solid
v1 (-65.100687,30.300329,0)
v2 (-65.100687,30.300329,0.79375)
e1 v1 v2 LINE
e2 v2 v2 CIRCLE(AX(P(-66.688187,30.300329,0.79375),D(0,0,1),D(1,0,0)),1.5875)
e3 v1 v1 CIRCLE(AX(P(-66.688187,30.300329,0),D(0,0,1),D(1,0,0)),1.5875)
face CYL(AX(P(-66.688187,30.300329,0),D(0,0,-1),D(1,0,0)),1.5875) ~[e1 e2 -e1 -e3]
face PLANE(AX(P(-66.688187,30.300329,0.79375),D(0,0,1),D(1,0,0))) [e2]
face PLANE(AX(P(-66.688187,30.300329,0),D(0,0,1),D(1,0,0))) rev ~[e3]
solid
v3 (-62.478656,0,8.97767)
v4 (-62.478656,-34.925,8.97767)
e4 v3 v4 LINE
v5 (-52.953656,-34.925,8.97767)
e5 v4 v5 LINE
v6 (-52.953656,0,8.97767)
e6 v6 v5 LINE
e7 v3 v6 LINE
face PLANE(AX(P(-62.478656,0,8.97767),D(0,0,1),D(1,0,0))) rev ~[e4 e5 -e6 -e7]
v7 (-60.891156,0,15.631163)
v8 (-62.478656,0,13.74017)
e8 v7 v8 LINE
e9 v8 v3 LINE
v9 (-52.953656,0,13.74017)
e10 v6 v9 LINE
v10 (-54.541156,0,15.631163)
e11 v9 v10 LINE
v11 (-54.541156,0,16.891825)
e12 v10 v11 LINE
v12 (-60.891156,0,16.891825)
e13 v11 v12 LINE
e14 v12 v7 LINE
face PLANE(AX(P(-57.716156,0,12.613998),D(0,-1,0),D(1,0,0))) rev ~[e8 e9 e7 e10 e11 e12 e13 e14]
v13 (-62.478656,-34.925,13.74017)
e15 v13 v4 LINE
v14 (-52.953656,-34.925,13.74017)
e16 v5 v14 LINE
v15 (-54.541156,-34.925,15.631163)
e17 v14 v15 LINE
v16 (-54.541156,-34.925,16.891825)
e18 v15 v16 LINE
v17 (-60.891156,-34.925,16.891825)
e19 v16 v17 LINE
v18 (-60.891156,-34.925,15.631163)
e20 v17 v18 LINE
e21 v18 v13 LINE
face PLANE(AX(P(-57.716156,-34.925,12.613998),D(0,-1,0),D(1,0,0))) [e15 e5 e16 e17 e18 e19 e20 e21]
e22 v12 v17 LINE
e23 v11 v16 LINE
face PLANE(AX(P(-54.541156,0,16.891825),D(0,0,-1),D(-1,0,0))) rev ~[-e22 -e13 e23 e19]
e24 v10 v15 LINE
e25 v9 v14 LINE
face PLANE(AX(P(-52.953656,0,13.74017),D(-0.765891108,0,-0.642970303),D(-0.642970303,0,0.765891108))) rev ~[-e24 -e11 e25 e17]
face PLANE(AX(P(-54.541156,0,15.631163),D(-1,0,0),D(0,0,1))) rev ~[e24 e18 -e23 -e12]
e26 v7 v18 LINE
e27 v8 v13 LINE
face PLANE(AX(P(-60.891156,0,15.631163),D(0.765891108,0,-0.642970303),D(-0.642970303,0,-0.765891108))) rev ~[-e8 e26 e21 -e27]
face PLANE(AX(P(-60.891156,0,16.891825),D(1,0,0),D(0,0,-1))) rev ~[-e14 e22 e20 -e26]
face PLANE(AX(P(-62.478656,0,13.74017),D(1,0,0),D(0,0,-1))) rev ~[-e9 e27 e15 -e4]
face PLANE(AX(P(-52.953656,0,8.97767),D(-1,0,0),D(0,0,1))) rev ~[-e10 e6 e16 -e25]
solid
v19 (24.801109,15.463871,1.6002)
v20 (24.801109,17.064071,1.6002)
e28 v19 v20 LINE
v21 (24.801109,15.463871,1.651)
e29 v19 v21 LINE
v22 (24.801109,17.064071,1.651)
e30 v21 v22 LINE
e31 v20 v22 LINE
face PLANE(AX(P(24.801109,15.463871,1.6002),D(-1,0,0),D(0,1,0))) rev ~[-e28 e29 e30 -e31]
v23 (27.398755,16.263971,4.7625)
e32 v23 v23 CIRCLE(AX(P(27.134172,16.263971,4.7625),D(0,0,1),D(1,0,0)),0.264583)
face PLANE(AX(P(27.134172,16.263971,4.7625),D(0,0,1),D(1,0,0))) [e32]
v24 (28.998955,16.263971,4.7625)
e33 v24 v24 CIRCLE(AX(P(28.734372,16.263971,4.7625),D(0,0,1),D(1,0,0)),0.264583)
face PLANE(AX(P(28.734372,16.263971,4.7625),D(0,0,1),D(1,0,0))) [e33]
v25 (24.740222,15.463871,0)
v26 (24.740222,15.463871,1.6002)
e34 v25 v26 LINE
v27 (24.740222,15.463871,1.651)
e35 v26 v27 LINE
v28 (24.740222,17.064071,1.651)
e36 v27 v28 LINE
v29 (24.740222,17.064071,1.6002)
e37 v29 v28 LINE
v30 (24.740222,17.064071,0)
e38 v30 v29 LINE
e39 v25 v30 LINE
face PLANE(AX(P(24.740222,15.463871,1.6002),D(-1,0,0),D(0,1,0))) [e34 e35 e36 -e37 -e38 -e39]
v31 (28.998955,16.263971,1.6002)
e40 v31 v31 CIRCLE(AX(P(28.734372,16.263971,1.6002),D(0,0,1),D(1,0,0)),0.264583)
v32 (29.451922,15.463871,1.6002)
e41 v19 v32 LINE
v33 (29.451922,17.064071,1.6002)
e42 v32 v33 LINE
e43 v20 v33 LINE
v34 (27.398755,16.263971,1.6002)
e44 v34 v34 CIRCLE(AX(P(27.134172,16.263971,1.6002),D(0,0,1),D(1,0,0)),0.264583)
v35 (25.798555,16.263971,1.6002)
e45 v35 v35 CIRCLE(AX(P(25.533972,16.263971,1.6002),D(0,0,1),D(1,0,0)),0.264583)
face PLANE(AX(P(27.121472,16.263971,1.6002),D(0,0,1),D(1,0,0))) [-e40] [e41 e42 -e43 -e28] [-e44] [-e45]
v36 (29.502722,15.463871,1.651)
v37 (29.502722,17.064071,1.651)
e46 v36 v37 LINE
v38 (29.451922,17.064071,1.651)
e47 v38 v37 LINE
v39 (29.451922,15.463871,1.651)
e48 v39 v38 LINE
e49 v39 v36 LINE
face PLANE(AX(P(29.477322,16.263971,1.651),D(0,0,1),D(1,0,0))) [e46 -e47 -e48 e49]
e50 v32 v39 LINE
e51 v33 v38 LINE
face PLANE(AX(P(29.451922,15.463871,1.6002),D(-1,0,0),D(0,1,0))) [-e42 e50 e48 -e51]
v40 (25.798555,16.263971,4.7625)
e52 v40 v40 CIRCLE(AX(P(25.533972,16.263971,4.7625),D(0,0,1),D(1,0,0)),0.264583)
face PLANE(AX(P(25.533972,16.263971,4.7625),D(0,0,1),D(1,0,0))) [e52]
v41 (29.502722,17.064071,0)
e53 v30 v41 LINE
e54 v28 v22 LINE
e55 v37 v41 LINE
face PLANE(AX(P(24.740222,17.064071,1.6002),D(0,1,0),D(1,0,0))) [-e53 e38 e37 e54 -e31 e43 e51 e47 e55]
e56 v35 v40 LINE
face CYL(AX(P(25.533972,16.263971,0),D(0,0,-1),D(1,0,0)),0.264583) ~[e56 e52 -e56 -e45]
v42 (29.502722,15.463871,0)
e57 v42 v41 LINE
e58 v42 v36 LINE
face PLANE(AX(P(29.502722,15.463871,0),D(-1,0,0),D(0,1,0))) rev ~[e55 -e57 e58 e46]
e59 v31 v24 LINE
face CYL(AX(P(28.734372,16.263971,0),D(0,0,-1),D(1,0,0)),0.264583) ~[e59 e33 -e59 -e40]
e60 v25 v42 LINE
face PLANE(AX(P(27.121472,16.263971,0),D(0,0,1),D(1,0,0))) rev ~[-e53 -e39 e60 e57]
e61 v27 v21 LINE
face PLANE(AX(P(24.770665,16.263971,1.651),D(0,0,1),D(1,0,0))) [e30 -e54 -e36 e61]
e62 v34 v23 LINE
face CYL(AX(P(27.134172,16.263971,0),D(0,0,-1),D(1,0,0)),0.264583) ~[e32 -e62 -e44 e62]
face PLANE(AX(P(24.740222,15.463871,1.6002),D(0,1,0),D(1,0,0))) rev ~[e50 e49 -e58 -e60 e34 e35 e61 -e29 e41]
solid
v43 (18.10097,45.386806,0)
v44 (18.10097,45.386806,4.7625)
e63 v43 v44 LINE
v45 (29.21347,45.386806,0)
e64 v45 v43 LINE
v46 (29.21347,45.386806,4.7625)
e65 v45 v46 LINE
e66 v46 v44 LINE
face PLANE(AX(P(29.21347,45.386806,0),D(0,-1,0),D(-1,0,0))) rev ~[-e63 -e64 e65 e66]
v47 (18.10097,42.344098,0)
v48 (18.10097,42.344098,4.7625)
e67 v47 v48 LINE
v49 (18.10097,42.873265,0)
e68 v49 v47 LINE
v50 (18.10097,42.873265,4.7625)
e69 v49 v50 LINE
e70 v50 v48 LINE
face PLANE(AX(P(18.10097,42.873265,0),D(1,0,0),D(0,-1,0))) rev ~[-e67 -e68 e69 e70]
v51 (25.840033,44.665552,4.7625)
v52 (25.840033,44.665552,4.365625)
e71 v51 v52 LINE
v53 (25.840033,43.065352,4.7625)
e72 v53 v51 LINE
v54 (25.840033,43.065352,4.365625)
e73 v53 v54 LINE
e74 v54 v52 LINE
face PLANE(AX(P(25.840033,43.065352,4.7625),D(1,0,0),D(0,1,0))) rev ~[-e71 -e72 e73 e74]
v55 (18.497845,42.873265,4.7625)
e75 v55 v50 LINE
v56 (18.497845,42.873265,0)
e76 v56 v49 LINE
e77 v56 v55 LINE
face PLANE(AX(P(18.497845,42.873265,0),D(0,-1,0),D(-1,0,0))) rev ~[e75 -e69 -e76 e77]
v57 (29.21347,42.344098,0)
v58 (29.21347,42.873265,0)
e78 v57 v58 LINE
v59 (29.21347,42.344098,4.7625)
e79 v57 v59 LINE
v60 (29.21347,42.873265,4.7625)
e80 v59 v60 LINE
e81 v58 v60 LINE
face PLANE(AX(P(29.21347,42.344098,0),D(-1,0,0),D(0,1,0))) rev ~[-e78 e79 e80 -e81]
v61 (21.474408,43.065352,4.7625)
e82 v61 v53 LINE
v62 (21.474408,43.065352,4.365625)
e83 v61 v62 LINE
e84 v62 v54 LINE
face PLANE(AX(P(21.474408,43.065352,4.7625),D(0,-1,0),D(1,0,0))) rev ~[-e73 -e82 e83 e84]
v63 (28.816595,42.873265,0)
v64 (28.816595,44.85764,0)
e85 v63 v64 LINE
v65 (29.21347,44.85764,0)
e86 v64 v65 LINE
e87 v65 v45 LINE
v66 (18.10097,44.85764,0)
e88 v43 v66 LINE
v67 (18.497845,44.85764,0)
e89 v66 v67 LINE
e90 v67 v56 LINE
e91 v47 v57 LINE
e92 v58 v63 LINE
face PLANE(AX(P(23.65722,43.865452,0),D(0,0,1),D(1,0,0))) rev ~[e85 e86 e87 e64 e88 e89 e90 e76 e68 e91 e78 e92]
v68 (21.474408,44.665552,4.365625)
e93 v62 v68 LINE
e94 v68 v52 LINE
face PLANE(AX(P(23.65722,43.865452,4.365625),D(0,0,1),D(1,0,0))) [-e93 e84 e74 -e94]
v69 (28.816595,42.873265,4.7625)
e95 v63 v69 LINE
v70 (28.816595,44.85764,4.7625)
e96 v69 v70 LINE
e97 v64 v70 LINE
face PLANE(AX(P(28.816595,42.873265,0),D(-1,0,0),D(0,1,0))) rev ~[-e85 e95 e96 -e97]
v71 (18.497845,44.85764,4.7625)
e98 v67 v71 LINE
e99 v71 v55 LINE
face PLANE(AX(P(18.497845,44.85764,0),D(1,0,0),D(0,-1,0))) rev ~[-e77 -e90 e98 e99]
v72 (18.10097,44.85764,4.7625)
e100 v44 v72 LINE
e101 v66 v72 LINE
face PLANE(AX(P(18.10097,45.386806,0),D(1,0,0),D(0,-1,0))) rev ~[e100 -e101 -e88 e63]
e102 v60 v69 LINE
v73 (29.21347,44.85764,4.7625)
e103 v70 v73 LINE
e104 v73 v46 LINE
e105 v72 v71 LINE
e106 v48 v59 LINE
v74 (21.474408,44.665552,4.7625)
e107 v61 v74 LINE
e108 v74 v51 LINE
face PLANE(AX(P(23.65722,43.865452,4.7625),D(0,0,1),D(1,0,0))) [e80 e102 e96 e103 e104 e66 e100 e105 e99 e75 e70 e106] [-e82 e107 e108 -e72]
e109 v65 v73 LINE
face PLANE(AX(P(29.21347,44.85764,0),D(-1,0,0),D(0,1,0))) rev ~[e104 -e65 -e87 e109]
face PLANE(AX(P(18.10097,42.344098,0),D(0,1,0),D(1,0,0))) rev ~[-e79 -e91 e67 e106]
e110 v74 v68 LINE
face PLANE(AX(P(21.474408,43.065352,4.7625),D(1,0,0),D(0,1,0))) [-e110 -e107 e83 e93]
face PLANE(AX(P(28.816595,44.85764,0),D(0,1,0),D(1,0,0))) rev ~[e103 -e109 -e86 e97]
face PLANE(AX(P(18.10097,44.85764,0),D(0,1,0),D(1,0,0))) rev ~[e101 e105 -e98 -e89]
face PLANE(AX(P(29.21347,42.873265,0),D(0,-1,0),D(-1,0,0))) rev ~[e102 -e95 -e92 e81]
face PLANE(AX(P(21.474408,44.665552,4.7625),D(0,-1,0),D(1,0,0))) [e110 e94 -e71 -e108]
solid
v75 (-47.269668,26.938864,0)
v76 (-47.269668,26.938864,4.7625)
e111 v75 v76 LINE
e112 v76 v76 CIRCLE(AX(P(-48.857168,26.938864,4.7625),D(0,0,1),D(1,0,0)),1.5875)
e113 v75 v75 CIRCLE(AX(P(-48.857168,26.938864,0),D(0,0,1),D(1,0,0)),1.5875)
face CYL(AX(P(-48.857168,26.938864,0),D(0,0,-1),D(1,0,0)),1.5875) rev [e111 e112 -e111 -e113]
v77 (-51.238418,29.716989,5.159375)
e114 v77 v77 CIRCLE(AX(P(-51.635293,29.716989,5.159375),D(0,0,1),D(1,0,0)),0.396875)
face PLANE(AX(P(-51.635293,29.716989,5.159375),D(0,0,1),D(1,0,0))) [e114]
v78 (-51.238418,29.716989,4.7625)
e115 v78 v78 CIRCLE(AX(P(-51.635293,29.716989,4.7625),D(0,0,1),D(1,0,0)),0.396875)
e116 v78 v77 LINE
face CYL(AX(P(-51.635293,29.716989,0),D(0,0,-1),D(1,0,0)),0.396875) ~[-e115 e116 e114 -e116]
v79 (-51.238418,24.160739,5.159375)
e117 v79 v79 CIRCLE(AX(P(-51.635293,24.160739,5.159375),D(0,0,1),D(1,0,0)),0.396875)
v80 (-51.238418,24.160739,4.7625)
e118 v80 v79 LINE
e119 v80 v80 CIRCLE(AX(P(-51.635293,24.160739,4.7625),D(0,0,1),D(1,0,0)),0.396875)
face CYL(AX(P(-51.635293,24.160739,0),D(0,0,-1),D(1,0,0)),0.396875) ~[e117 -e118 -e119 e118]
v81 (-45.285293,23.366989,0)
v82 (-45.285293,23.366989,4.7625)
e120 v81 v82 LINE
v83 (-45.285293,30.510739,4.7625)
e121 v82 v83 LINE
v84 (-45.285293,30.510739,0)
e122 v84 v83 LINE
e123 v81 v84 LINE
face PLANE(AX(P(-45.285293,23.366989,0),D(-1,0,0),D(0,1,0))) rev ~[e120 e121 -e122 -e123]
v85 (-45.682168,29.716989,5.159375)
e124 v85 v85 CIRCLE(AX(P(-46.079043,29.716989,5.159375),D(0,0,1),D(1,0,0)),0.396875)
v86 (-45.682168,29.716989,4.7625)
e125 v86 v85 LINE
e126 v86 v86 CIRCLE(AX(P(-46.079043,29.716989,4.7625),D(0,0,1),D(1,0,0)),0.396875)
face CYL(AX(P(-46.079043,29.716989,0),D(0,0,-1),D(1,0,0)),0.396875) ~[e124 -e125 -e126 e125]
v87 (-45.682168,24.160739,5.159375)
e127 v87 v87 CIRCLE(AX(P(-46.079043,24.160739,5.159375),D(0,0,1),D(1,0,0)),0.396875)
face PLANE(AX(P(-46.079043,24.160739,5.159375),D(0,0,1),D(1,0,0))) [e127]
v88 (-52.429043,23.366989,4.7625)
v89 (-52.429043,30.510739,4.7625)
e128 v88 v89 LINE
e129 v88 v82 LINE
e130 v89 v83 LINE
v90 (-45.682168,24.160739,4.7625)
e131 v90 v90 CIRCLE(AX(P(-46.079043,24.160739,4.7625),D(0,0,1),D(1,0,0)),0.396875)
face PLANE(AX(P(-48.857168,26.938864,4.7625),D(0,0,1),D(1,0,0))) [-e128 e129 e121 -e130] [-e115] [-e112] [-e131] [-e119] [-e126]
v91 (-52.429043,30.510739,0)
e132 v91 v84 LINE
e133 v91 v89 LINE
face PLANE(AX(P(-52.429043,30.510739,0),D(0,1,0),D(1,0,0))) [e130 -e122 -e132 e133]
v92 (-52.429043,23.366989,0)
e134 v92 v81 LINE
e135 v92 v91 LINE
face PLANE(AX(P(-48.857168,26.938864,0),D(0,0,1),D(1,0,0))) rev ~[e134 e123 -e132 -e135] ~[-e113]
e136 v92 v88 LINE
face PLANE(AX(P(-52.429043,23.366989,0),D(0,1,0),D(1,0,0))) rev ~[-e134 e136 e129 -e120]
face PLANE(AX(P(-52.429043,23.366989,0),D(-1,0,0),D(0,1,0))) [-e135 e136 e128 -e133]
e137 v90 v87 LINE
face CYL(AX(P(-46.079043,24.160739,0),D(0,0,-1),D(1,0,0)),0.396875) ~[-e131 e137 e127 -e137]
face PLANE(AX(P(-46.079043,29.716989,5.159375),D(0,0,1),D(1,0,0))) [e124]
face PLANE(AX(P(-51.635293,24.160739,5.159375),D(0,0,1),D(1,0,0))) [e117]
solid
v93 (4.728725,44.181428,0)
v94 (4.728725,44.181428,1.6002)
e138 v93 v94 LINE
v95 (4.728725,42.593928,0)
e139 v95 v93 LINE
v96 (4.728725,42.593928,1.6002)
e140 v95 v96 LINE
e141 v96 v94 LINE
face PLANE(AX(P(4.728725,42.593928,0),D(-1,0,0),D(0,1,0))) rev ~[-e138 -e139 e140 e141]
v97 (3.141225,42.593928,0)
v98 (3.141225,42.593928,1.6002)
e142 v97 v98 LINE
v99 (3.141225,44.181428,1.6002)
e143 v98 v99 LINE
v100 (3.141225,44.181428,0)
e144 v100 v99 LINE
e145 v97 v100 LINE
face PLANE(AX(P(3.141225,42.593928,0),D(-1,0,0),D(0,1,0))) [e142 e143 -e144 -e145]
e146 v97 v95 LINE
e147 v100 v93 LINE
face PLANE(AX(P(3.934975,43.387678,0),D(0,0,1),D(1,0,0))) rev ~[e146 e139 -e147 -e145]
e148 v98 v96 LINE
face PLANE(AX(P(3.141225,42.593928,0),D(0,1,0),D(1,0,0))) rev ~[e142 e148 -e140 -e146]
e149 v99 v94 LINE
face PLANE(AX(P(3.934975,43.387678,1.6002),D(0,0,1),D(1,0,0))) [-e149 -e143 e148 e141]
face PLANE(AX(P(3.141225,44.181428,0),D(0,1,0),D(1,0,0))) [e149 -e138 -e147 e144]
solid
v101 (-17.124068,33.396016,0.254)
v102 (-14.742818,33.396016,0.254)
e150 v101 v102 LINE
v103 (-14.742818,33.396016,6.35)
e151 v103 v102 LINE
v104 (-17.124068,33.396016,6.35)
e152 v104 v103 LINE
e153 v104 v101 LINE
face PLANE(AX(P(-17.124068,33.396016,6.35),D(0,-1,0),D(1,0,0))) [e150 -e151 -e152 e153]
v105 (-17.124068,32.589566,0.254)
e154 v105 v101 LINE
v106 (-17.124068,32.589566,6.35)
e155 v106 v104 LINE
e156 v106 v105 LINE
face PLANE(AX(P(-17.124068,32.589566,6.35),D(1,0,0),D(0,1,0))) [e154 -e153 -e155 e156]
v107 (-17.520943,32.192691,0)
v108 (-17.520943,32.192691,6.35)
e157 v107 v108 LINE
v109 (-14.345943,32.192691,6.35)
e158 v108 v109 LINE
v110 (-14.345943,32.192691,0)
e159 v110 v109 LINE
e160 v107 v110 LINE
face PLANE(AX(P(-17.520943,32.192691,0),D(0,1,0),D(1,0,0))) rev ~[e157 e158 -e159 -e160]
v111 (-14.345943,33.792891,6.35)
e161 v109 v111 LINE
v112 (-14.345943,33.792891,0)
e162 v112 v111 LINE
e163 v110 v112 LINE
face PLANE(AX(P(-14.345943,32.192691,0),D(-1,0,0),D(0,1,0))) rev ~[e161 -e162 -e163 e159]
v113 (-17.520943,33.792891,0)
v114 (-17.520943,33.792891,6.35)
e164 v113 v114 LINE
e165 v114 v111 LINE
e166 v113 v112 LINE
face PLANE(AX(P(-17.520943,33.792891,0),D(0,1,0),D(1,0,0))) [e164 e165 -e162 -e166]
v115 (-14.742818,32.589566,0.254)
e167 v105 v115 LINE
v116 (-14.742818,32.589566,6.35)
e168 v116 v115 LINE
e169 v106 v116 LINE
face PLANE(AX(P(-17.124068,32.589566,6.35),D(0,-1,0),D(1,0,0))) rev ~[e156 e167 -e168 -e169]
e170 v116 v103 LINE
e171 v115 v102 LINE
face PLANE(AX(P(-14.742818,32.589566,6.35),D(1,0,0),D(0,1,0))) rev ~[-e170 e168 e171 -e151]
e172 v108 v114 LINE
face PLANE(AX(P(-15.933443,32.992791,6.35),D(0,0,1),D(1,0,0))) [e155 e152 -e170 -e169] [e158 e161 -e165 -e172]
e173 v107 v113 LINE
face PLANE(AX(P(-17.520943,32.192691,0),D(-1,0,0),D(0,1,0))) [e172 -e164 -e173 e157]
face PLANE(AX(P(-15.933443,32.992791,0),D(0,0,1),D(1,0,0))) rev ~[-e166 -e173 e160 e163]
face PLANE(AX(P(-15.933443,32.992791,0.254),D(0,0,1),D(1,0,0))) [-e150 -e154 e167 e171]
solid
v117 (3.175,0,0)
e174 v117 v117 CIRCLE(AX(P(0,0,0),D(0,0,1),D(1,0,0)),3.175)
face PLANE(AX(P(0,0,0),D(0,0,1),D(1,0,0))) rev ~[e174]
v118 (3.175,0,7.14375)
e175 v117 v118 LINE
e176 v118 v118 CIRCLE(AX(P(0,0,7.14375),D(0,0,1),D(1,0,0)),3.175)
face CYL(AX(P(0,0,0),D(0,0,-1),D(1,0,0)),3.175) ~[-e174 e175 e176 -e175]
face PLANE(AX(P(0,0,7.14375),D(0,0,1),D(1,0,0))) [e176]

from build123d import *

# Parameters (mm, degrees)
F0_R      = 3.175
F1_DEPTH  = 7.14375
F3_DEPTH  = 34.925
F4_W      = 7.14375
F4_H      = 7.14375
F4_R      = 0.396875
F4_R_2    = 1.5875
F5_DEPTH  = 4.7625
F6_DEPTH  = 5.159375
F8_DEPTH  = 4.7625
F9_W      = 4.365625
F9_H      = 1.6002
F10_DEPTH = 0.396875
F11_W     = 1.5875
F11_H     = 1.5875
F12_DEPTH = 1.6002
F13_W     = 4.7625
F13_H     = 1.6002
F13_R     = 0.2645833333
F14_DEPTH = 1.6002
F15_DEPTH = 4.7625
F16_W     = 3.175
F16_H     = 1.6002
F17_DEPTH = 6.35
F18_W     = 2.38125
F18_H     = 0.80645
F19_DEPTH = 6.096
F20_W     = 0.0608872609
F20_H     = 1.6002
F20_W_2   = 0.0508
F21_DEPTH = 0.0508
F22_R     = 1.5875
F23_DEPTH = 0.79375


# Not quite as in the source:
# - a length typed as a fraction of an inch, garbled in the dataset ("3 / 203.2 mm" for 3/8 in), is restored


with BuildPart() as f1:
    # F0 (on Top) → F1 (new body)
    with BuildSketch(Plane.XY):
        Circle(F0_R)
    extrude(amount=F1_DEPTH)


with BuildPart() as f3:
    # F2 (on Front) → F3 (new body)
    with BuildSketch(Plane.XZ):
        Polygon((-60.8911556599, 15.6311627035), (-62.4786556599, 13.7401700254), (-62.4786556599, 8.9776700254), (-52.9536556599, 8.9776700254), (-52.9536556599, 13.7401700254), (-54.5411556599, 15.6311627035), (-54.5411556599, 16.8918247443), (-60.8911556599, 16.8918247443), align=None)
    extrude(amount=F3_DEPTH)


with BuildPart() as f5:
    # F4 (on Top) → F5 (new body)
    with BuildSketch(Plane.XY):
        with Locations((-48.8571682945, 26.9388640299)):
            Rectangle(F4_W, F4_H)
        with Locations((-51.6352932945, 24.1607390299)):
            Circle(F4_R, mode=Mode.SUBTRACT)
        with Locations((-46.0790432945, 24.1607390299)):
            Circle(F4_R, mode=Mode.SUBTRACT)
        with Locations((-51.6352932945, 29.7169890299)):
            Circle(F4_R, mode=Mode.SUBTRACT)
        with Locations((-48.8571682945, 26.9388640299)):
            Circle(F4_R_2, mode=Mode.SUBTRACT)
        with Locations((-46.0790432945, 29.7169890299)):
            Circle(F4_R, mode=Mode.SUBTRACT)
    extrude(amount=F5_DEPTH)

    # F4 (on Top) → F6 (join)
    with BuildSketch(Plane.XY):
        with Locations((-51.6352932945, 29.7169890299)):
            Circle(F4_R)
        with Locations((-46.0790432945, 29.7169890299)):
            Circle(F4_R)
        with Locations((-46.0790432945, 24.1607390299)):
            Circle(F4_R)
        with Locations((-51.6352932945, 24.1607390299)):
            Circle(F4_R)
    extrude(amount=F6_DEPTH)


with BuildPart() as f8:
    # F7 (on Top) → F8 (new body)
    with BuildSketch(Plane.XY):
        Polygon((29.2134701102, 45.3868062362), (18.1009701102, 45.3868062362), (18.1009701102, 44.8576395696), (18.4978451102, 44.8576395696), (18.4978451102, 42.8732645696), (18.1009701102, 42.8732645696), (18.1009701102, 42.3440979029), (29.2134701102, 42.3440979029), (29.2134701102, 42.8732645696), (28.8165951102, 42.8732645696), (28.8165951102, 44.8576395696), (29.2134701102, 44.8576395696), align=None)
    extrude(amount=F8_DEPTH)

    # F9 (on face) → F10 (cut)
    with BuildSketch(Plane.XY.offset(4.7625)):
        with Locations((23.6572201102, 43.8654520696)):
            Rectangle(F9_W, F9_H)
    extrude(amount=-F10_DEPTH, mode=Mode.SUBTRACT)


with BuildPart() as f12:
    # F11 (on Top) → F12 (new body)
    with BuildSketch(Plane.XY):
        with Locations((3.9349747822, 43.3876775205)):
            Rectangle(F11_W, F11_H)
    extrude(amount=F12_DEPTH)


with BuildPart() as f14:
    # F13 (on Top) → F14 (new body)
    with BuildSketch(Plane.XY):
        with Locations((27.1214717252, 16.2639711052)):
            Rectangle(F13_W, F13_H)
        with Locations((25.5339717252, 16.2639711052)):
            Circle(F13_R, mode=Mode.SUBTRACT)
        with Locations((27.1341717252, 16.2639711052)):
            Circle(F13_R, mode=Mode.SUBTRACT)
        with Locations((28.7343717252, 16.2639711052)):
            Circle(F13_R, mode=Mode.SUBTRACT)
    extrude(amount=F14_DEPTH)

    # F13 (on Top) → F15 (join)
    with BuildSketch(Plane.XY):
        with Locations((25.5339717252, 16.2639711052)):
            Circle(F13_R)
        with Locations((27.1341717252, 16.2639711052)):
            Circle(F13_R)
        with Locations((28.7343717252, 16.2639711052)):
            Circle(F13_R)
    extrude(amount=F15_DEPTH)

    # F20 (on face) → F21 (join)
    with BuildSketch(Plane.XY.offset(1.6002)):
        with Locations((24.7706653557, 16.2639711052)):
            Rectangle(F20_W, F20_H)
        with Locations((29.4773217252, 16.2639711052)):
            Rectangle(F20_W_2, F20_H)
    extrude(amount=F21_DEPTH)


with BuildPart() as f17:
    # F16 (on Top) → F17 (new body)
    with BuildSketch(Plane.XY):
        with Locations((-15.9334428608, 32.9927906)):
            Rectangle(F16_W, F16_H)
    extrude(amount=F17_DEPTH)

    # F18 (on face) → F19 (cut)
    with BuildSketch(Plane.XY.offset(6.35)):
        with Locations((-15.9334428608, 32.9927906)):
            Rectangle(F18_W, F18_H)
    extrude(amount=-F19_DEPTH, mode=Mode.SUBTRACT)


with BuildPart() as f23:
    # F22 (on Top) → F23 (new body)
    with BuildSketch(Plane.XY):
        with Locations((-66.6881874204, 30.300328508)):
            Circle(F22_R)
    extrude(amount=F23_DEPTH)


solid = Compound([f1.part, f3.part, f5.part, f8.part, f12.part, f14.part, f17.part, f23.part])
